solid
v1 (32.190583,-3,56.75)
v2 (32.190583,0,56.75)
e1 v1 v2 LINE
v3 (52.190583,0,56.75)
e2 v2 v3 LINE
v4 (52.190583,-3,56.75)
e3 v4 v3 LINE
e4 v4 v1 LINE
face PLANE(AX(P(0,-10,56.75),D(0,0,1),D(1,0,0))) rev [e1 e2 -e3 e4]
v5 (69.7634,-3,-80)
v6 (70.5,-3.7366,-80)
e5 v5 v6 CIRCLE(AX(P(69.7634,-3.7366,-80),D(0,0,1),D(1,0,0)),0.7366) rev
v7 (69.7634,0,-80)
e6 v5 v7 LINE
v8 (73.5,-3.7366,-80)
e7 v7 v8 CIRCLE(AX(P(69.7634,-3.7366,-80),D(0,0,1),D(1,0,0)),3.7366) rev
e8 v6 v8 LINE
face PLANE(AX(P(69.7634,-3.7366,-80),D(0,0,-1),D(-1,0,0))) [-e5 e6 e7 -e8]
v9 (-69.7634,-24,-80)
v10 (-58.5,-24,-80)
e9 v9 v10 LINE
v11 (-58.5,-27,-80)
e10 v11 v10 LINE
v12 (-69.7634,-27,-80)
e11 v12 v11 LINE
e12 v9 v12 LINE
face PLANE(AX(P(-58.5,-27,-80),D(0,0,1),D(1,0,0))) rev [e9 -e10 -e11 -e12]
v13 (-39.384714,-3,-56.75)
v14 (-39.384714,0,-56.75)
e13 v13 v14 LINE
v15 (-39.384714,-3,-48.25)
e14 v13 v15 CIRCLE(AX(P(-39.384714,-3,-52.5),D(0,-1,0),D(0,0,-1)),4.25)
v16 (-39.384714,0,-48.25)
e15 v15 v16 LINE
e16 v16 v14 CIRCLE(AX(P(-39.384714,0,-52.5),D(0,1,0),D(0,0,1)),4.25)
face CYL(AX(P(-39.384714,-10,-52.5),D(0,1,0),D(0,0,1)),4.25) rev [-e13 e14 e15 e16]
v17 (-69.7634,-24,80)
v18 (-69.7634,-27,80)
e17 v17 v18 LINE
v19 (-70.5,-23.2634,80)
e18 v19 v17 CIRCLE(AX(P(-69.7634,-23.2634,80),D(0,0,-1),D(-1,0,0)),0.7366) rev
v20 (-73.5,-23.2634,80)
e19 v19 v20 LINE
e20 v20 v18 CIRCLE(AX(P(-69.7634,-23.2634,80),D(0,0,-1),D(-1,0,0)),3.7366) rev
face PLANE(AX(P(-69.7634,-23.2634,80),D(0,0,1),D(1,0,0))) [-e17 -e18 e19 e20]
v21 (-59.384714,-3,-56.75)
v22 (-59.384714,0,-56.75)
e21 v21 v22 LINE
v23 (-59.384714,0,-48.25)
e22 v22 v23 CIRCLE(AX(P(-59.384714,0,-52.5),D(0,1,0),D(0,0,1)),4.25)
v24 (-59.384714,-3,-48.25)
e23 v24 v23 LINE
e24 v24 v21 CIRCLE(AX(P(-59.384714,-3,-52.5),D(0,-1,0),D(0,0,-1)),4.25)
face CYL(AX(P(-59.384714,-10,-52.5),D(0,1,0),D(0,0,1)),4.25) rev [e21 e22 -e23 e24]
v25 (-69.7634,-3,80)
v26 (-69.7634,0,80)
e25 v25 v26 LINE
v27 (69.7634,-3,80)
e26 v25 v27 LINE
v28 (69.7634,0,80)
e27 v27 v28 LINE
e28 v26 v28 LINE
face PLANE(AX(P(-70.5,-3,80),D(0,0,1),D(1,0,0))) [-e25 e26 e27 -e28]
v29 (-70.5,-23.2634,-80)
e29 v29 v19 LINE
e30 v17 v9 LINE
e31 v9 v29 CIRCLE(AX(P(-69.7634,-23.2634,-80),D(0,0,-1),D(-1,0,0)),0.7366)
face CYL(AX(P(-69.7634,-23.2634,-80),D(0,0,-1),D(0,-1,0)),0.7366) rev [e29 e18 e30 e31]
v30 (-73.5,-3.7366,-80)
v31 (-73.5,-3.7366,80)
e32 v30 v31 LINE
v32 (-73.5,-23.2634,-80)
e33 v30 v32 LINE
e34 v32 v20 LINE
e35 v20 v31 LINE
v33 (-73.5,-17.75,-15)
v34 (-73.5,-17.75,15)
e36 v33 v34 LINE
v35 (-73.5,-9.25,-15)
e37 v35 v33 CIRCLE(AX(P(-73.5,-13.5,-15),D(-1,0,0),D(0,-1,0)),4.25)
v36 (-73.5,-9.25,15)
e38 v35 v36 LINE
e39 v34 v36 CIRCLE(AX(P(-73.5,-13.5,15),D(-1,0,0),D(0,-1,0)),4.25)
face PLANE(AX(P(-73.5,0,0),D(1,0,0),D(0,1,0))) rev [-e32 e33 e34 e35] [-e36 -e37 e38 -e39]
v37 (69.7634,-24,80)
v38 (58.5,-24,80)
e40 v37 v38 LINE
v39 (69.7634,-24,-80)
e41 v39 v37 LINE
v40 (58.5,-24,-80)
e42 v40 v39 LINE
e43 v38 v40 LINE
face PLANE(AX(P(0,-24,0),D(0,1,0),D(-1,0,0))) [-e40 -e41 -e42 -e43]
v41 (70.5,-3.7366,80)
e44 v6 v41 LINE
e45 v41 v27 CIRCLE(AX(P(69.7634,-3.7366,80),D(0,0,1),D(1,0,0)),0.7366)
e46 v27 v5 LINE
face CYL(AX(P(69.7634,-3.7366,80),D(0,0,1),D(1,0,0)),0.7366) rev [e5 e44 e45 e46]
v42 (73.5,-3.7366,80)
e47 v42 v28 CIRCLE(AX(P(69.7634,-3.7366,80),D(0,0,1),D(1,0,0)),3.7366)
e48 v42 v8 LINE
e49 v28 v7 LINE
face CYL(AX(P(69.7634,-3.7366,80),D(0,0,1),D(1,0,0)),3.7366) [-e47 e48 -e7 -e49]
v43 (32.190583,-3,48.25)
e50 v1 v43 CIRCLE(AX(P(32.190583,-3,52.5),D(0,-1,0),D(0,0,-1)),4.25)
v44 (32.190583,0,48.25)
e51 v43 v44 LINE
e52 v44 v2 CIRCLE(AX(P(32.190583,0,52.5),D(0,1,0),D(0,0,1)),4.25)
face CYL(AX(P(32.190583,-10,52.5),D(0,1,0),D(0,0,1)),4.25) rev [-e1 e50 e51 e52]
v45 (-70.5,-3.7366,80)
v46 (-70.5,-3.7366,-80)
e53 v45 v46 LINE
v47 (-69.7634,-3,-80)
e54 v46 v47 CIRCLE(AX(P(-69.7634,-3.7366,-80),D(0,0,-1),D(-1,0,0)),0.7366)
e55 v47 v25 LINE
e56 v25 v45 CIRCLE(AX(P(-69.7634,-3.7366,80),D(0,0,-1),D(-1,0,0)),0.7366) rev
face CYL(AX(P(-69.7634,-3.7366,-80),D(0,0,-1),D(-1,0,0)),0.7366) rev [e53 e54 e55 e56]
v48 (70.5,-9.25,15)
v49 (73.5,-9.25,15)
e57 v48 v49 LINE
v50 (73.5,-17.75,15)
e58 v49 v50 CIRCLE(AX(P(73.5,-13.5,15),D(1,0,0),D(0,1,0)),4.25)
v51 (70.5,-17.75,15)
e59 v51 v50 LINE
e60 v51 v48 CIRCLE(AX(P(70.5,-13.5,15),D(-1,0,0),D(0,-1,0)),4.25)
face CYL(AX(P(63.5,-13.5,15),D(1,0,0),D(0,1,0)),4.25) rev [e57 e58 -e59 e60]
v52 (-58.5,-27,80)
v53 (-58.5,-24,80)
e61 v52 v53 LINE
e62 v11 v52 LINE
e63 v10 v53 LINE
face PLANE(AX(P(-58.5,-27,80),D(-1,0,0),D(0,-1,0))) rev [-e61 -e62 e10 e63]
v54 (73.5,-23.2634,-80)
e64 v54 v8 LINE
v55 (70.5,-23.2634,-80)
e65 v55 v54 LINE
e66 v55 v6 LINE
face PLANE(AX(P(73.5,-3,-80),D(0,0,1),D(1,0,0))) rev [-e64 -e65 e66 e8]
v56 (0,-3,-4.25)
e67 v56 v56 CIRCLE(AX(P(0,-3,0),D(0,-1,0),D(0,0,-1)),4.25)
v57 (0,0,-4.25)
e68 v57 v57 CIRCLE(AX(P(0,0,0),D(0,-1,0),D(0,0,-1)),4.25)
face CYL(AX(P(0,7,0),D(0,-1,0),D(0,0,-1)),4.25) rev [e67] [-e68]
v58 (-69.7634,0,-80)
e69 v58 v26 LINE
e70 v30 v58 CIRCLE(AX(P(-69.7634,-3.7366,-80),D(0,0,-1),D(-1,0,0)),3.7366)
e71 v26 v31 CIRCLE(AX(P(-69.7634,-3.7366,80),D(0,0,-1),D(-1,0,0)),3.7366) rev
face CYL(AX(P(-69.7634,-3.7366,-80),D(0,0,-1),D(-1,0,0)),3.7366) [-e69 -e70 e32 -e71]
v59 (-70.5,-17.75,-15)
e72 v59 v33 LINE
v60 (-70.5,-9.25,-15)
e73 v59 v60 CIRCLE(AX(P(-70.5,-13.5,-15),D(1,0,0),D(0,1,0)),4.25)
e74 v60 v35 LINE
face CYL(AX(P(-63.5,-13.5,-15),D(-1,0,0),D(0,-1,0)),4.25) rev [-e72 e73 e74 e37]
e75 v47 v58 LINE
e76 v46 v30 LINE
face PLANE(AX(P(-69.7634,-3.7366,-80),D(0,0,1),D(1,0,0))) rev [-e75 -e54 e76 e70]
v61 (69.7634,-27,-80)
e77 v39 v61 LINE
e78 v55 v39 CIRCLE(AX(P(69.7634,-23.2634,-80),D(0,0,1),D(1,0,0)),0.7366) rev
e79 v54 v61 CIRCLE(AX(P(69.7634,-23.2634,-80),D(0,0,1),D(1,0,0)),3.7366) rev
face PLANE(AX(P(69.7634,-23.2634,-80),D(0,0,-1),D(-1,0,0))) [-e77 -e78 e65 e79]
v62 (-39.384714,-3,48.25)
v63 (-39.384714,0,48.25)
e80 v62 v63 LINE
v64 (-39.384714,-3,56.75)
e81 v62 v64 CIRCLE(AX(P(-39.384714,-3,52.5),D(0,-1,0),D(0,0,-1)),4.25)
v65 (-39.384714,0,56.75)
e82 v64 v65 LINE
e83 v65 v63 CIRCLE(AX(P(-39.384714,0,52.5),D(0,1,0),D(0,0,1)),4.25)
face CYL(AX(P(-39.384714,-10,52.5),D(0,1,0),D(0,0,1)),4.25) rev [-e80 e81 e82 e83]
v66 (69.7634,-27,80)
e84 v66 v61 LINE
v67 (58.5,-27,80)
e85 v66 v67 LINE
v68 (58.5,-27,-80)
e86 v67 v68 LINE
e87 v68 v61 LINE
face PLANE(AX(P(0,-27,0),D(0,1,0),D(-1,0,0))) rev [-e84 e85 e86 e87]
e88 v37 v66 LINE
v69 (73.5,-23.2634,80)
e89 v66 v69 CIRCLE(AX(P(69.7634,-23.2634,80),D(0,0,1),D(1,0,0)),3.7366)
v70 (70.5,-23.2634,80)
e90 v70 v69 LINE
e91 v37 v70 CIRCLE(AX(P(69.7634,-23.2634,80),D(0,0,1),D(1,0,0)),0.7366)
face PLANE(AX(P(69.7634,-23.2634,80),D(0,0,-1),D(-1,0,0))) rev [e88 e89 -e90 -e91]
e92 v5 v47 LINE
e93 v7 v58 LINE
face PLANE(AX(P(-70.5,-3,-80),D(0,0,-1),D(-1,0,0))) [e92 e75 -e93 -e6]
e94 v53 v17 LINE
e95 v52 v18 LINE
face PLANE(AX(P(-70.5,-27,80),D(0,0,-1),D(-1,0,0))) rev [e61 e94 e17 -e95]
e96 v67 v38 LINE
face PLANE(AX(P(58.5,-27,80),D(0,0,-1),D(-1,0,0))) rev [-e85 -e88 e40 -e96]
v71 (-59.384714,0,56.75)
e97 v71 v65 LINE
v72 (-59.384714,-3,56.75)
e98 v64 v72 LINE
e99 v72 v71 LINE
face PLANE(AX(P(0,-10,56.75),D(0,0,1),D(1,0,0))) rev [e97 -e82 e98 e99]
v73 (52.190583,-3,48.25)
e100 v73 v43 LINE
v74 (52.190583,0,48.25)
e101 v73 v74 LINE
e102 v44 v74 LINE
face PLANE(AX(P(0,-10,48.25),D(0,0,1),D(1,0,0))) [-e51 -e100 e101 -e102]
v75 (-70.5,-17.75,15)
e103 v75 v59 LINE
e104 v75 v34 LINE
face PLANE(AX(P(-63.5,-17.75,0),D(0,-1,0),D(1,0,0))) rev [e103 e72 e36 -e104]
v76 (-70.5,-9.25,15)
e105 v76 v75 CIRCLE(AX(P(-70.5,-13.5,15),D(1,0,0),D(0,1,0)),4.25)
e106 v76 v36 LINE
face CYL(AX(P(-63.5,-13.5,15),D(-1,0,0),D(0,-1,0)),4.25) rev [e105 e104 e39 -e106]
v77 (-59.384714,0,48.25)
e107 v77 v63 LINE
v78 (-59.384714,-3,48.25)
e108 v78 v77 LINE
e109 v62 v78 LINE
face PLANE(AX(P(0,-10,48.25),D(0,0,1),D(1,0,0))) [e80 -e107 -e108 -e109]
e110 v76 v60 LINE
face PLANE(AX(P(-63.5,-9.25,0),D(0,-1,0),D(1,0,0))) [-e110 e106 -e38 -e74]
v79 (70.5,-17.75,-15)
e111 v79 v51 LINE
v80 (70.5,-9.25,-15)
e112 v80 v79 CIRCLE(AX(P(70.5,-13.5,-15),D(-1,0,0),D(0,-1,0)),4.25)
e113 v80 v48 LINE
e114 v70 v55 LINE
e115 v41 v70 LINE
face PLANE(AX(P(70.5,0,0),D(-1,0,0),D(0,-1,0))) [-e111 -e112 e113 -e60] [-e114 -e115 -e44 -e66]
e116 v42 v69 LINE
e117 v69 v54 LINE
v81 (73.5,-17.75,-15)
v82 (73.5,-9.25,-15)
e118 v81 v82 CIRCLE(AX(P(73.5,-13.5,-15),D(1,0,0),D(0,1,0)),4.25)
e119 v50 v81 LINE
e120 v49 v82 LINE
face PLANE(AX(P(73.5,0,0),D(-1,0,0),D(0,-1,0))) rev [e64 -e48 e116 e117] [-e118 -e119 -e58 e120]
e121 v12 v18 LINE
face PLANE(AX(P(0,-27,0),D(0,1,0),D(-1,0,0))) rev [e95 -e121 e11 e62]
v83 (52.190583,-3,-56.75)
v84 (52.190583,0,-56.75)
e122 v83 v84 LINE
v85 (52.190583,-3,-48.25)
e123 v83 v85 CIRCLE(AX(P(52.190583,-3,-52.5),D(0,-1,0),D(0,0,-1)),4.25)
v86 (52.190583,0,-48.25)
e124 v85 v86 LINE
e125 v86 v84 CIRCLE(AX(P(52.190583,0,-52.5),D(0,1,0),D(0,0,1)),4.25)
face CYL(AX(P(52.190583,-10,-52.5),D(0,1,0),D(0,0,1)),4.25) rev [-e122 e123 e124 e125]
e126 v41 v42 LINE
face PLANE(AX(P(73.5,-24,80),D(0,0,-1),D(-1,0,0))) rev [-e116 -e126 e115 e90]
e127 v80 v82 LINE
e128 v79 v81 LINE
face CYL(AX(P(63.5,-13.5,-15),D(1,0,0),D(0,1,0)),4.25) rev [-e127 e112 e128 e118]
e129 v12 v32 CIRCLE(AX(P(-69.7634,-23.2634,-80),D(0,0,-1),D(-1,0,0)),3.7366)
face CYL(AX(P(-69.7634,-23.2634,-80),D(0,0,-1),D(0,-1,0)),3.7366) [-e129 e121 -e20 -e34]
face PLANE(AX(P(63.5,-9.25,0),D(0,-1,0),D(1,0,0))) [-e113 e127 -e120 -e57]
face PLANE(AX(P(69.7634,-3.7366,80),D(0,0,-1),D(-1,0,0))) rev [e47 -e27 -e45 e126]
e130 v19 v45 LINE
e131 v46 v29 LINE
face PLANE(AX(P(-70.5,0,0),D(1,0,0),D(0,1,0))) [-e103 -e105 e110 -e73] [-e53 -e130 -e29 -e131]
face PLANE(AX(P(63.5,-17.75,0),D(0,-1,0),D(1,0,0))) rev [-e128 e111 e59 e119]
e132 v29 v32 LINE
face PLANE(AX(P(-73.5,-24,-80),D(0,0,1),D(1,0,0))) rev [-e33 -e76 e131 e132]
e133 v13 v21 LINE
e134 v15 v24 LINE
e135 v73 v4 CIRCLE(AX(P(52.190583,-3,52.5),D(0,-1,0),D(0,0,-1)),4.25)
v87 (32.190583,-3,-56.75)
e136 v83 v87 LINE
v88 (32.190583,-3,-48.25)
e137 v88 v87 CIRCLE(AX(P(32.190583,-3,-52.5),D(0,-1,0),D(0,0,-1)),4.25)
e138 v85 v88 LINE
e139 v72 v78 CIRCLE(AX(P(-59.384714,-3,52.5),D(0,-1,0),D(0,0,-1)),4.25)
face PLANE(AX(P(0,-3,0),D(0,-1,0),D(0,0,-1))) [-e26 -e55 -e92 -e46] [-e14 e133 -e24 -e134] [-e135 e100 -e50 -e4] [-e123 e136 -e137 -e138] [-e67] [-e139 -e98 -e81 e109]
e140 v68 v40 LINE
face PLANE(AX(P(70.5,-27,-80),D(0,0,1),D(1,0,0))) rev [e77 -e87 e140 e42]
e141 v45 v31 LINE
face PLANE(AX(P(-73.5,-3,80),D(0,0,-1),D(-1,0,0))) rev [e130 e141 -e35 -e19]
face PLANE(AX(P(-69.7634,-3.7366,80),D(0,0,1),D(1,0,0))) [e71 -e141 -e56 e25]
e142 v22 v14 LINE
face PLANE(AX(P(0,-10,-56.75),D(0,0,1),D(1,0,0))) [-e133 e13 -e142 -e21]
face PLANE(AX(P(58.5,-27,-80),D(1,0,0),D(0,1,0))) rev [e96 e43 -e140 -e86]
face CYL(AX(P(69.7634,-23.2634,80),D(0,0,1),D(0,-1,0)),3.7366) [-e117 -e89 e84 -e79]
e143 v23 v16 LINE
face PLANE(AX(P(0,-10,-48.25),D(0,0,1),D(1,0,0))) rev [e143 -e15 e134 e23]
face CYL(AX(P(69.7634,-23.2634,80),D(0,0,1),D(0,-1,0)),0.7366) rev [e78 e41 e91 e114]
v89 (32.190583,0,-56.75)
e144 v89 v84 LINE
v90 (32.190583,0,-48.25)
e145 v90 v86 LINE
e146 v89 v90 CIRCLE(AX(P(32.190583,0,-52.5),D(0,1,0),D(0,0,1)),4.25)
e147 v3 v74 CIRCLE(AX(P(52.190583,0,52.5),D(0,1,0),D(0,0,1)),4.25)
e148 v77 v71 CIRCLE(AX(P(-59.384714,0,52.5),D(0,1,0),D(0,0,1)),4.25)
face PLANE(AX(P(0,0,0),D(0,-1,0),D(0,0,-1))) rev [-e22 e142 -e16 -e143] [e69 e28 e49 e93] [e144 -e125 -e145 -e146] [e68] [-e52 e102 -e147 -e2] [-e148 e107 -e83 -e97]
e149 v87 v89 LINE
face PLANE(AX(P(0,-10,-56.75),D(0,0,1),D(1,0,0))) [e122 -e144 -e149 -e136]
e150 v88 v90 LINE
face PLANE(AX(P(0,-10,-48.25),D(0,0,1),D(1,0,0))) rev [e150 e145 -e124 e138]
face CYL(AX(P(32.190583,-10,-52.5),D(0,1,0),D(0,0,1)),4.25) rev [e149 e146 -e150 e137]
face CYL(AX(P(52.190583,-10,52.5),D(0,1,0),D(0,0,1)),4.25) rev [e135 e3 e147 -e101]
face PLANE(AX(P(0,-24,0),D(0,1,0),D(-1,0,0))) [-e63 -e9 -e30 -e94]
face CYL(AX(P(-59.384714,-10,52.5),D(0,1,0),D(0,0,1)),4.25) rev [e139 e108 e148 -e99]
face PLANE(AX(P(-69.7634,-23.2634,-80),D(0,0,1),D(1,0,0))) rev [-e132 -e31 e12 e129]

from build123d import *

# Parameters (mm, degrees)
SKETCH1_W                      = 141
SKETCH1_H                      = 160
BASE_FLANGE3_DEPTH             = 3
EDGE_FLANGE6_STRIP_W           = 13.4732
EDGE_FLANGE6_STRIP_H           = 3
EDGE_FLANGE6_STRIP_CUT_DEPTH   = 160
EDGE_FLANGE6_STRIP_2_W         = 13.4732
EDGE_FLANGE6_STRIP_2_H         = 3
EDGE_FLANGE6_STRIP_CUT_2_DEPTH = 160
EDGE_FLANGE6_DEPTH             = 160
EDGE_FLANGE6_BEND_DEPTH        = 160
EDGE_FLANGE8_STRIP_W           = 13.4732
EDGE_FLANGE8_STRIP_H           = 3
EDGE_FLANGE8_STRIP_CUT_DEPTH   = 160
EDGE_FLANGE8_STRIP_2_W         = 13.4732
EDGE_FLANGE8_STRIP_2_H         = 3
EDGE_FLANGE8_STRIP_CUT_2_DEPTH = 160
EDGE_FLANGE8_DEPTH             = 160
EDGE_FLANGE8_BEND_DEPTH        = 160
SKETCH76_R                     = 4.25
CUT_EXTRUDE1_DEPTH             = 10
CUT_EXTRUDE3_START             = -10
SKETCH80_R                     = 4.25
CUT_EXTRUDE3_DEPTH             = 10
CUT_EXTRUDE4_DEPTH             = 10
SKETCH85_R                     = 4.25
CUT_EXTRUDE5_DEPTH             = 10


# Sheet-metal steps are written as plain solids
with BuildPart() as part:
    # Sketch1 → Base-Flange3 (new body)
    with BuildSketch(Plane(origin=(0, 0, 0), x_dir=(1, 0, 0), z_dir=(0, 1, 0))):
        Rectangle(SKETCH1_W, SKETCH1_H)
    extrude(amount=-BASE_FLANGE3_DEPTH)

    # Edge-Flange6 strip (across the edge) → Edge-Flange6 strip cut (cut)
    with BuildSketch(Plane(origin=(-70.5, -3, 80), x_dir=(1, 0, 0), z_dir=(0, 0, -1))):
        with Locations((-6, -1.5)):
            Rectangle(EDGE_FLANGE6_STRIP_W, EDGE_FLANGE6_STRIP_H)
    extrude(amount=EDGE_FLANGE6_STRIP_CUT_DEPTH, mode=Mode.SUBTRACT)

    # Edge-Flange6 strip 2 (across the edge) → Edge-Flange6 strip cut 2 (cut)
    with BuildSketch(Plane(origin=(70.5, -3, -80), x_dir=(-1, 0, 0), z_dir=(0, 0, 1))):
        with Locations((-6, -1.5)):
            Rectangle(EDGE_FLANGE6_STRIP_2_W, EDGE_FLANGE6_STRIP_2_H)
    extrude(amount=EDGE_FLANGE6_STRIP_CUT_2_DEPTH, mode=Mode.SUBTRACT)

    # Edge-Flange6 section (across the edge) → Edge-Flange6 (add)
    with BuildSketch(Plane(origin=(-70.5, -3, 80), x_dir=(1, 0, 0), z_dir=(0, 0, -1))):
        with BuildLine():
            Line((-3, 0.7366), (-3, 21))
            Line((-3, 21), (0, 21))
            Line((0, 21), (0, 0.7366))
            ThreePointArc((0, 0.7366), (0.215745145, 0.215745145), (0.7366, 0))
            Line((0.7366, 0), (0.7366, -3))
            ThreePointArc((0.7366, -3), (-1.905575199, -1.905575199), (-3, 0.7366))
        make_face()
    extrude(amount=EDGE_FLANGE6_DEPTH)

    # Edge-Flange6 section 2 (across the edge) → Edge-Flange6 bend (add)
    with BuildSketch(Plane(origin=(70.5, -3, -80), x_dir=(-1, 0, 0), z_dir=(0, 0, 1))):
        with BuildLine():
            Line((-3, 0.7366), (-3, 21))
            Line((-3, 21), (0, 21))
            Line((0, 21), (0, 0.7366))
            ThreePointArc((0, 0.7366), (0.215745145, 0.215745145), (0.7366, 0))
            Line((0.7366, 0), (0.7366, -3))
            ThreePointArc((0.7366, -3), (-1.905575199, -1.905575199), (-3, 0.7366))
        make_face()
    extrude(amount=EDGE_FLANGE6_BEND_DEPTH)

    # Edge-Flange8 strip (across the edge) → Edge-Flange8 strip cut (cut)
    with BuildSketch(Plane(origin=(-70.5, -24, 80), x_dir=(0, 1, 0), z_dir=(0, 0, -1))):
        with Locations((-6, -1.5)):
            Rectangle(EDGE_FLANGE8_STRIP_W, EDGE_FLANGE8_STRIP_H)
    extrude(amount=EDGE_FLANGE8_STRIP_CUT_DEPTH, mode=Mode.SUBTRACT)

    # Edge-Flange8 strip 2 (across the edge) → Edge-Flange8 strip cut 2 (cut)
    with BuildSketch(Plane(origin=(70.5, -24, -80), x_dir=(0, 1, 0), z_dir=(0, 0, 1))):
        with Locations((-6, -1.5)):
            Rectangle(EDGE_FLANGE8_STRIP_2_W, EDGE_FLANGE8_STRIP_2_H)
    extrude(amount=EDGE_FLANGE8_STRIP_CUT_2_DEPTH, mode=Mode.SUBTRACT)

    # Edge-Flange8 section (across the edge) → Edge-Flange8 (add)
    with BuildSketch(Plane(origin=(-70.5, -24, 80), x_dir=(0, 1, 0), z_dir=(0, 0, -1))):
        with BuildLine():
            Line((-3, 0.7366), (-3, 12))
            Line((-3, 12), (0, 12))
            Line((0, 12), (0, 0.7366))
            ThreePointArc((0, 0.7366), (0.215745145, 0.215745145), (0.7366, 0))
            Line((0.7366, 0), (0.7366, -3))
            ThreePointArc((0.7366, -3), (-1.905575199, -1.905575199), (-3, 0.7366))
        make_face()
    extrude(amount=EDGE_FLANGE8_DEPTH)

    # Edge-Flange8 section 2 (across the edge) → Edge-Flange8 bend (add)
    with BuildSketch(Plane(origin=(70.5, -24, -80), x_dir=(0, 1, 0), z_dir=(0, 0, 1))):
        with BuildLine():
            Line((-3, 0.7366), (-3, 12))
            Line((-3, 12), (0, 12))
            Line((0, 12), (0, 0.7366))
            ThreePointArc((0, 0.7366), (0.215745145, 0.215745145), (0.7366, 0))
            Line((0.7366, 0), (0.7366, -3))
            ThreePointArc((0.7366, -3), (-1.905575199, -1.905575199), (-3, 0.7366))
        make_face()
    extrude(amount=EDGE_FLANGE8_BEND_DEPTH)

    # Sketch76 → Cut-Extrude1 (cut)
    with BuildSketch(Plane.ZY.offset(73.5)):
        with Locations((-15, -13.5)):
            Circle(SKETCH76_R)
        with BuildLine():
            Line((15, -9.25), (-15, -9.25))
            ThreePointArc((-15, -9.25), (-11.99479618, -10.49479618), (-10.75, -13.5))
            ThreePointArc((-10.75, -13.5), (-11.99479618, -16.50520382), (-15, -17.75))
            Line((-15, -17.75), (15, -17.75))
            ThreePointArc((15, -17.75), (10.75, -13.5), (15, -9.25))
        make_face()
        with Locations((15, -13.5)):
            Circle(SKETCH76_R)
    extrude(amount=-CUT_EXTRUDE1_DEPTH, mode=Mode.SUBTRACT)

    # Sketch80 → Cut-Extrude3 (cut)
    with BuildSketch(Plane(origin=(73.5, 0, 0), x_dir=(0, 0, -1), z_dir=(1, 0, 0)).offset(CUT_EXTRUDE3_START)):
        with Locations((-15, -13.5)):
            Circle(SKETCH80_R)
        with BuildLine():
            Line((15, -9.25), (-15, -9.25))
            ThreePointArc((-15, -9.25), (-11.99479618, -10.49479618), (-10.75, -13.5))
            ThreePointArc((-10.75, -13.5), (-11.99479618, -16.50520382), (-15, -17.75))
            Line((-15, -17.75), (15, -17.75))
            ThreePointArc((15, -17.75), (10.75, -13.5), (15, -9.25))
        make_face()
        with Locations((15, -13.5)):
            Circle(SKETCH80_R)
    extrude(amount=CUT_EXTRUDE3_DEPTH, mode=Mode.SUBTRACT)

    # Sketch84 → Cut-Extrude4 (cut)
    with BuildSketch(Plane(origin=(0, 0, 0), x_dir=(1, 0, 0), z_dir=(0, 1, 0))):
        with BuildLine():
            Line((32.190582692, -56.75), (52.190582692, -56.75))
            ThreePointArc((52.190582692, -56.75), (56.440582692, -52.5), (52.190582692, -48.25))
            Line((52.190582692, -48.25), (32.190582692, -48.25))
            ThreePointArc((32.190582692, -48.25), (27.940582692, -52.5), (32.190582692, -56.75))
        make_face()
        with BuildLine():
            Line((-59.384714022, -56.75), (-39.384714022, -56.75))
            ThreePointArc((-39.384714022, -56.75), (-35.134714022, -52.5), (-39.384714022, -48.25))
            Line((-39.384714022, -48.25), (-59.384714022, -48.25))
            ThreePointArc((-59.384714022, -48.25), (-63.634714022, -52.5), (-59.384714022, -56.75))
        make_face()
        with BuildLine():
            Line((-59.384714022, 48.25), (-39.384714022, 48.25))
            ThreePointArc((-39.384714022, 48.25), (-35.134714022, 52.5), (-39.384714022, 56.75))
            Line((-39.384714022, 56.75), (-59.384714022, 56.75))
            ThreePointArc((-59.384714022, 56.75), (-63.634714022, 52.5), (-59.384714022, 48.25))
        make_face()
        with BuildLine():
            Line((32.190582692, 48.25), (52.190582692, 48.25))
            ThreePointArc((52.190582692, 48.25), (56.440582692, 52.5), (52.190582692, 56.75))
            Line((52.190582692, 56.75), (32.190582692, 56.75))
            ThreePointArc((32.190582692, 56.75), (27.940582692, 52.5), (32.190582692, 48.25))
        make_face()
    extrude(amount=-CUT_EXTRUDE4_DEPTH, mode=Mode.SUBTRACT)

    # Sketch85 → Cut-Extrude5 (cut)
    with BuildSketch(Plane.XZ.offset(3)):
        with Locations(Location((0, 0, 0), (0, 0, 270))):
            Circle(SKETCH85_R)
    extrude(amount=-CUT_EXTRUDE5_DEPTH, mode=Mode.SUBTRACT)


solid = part.part
